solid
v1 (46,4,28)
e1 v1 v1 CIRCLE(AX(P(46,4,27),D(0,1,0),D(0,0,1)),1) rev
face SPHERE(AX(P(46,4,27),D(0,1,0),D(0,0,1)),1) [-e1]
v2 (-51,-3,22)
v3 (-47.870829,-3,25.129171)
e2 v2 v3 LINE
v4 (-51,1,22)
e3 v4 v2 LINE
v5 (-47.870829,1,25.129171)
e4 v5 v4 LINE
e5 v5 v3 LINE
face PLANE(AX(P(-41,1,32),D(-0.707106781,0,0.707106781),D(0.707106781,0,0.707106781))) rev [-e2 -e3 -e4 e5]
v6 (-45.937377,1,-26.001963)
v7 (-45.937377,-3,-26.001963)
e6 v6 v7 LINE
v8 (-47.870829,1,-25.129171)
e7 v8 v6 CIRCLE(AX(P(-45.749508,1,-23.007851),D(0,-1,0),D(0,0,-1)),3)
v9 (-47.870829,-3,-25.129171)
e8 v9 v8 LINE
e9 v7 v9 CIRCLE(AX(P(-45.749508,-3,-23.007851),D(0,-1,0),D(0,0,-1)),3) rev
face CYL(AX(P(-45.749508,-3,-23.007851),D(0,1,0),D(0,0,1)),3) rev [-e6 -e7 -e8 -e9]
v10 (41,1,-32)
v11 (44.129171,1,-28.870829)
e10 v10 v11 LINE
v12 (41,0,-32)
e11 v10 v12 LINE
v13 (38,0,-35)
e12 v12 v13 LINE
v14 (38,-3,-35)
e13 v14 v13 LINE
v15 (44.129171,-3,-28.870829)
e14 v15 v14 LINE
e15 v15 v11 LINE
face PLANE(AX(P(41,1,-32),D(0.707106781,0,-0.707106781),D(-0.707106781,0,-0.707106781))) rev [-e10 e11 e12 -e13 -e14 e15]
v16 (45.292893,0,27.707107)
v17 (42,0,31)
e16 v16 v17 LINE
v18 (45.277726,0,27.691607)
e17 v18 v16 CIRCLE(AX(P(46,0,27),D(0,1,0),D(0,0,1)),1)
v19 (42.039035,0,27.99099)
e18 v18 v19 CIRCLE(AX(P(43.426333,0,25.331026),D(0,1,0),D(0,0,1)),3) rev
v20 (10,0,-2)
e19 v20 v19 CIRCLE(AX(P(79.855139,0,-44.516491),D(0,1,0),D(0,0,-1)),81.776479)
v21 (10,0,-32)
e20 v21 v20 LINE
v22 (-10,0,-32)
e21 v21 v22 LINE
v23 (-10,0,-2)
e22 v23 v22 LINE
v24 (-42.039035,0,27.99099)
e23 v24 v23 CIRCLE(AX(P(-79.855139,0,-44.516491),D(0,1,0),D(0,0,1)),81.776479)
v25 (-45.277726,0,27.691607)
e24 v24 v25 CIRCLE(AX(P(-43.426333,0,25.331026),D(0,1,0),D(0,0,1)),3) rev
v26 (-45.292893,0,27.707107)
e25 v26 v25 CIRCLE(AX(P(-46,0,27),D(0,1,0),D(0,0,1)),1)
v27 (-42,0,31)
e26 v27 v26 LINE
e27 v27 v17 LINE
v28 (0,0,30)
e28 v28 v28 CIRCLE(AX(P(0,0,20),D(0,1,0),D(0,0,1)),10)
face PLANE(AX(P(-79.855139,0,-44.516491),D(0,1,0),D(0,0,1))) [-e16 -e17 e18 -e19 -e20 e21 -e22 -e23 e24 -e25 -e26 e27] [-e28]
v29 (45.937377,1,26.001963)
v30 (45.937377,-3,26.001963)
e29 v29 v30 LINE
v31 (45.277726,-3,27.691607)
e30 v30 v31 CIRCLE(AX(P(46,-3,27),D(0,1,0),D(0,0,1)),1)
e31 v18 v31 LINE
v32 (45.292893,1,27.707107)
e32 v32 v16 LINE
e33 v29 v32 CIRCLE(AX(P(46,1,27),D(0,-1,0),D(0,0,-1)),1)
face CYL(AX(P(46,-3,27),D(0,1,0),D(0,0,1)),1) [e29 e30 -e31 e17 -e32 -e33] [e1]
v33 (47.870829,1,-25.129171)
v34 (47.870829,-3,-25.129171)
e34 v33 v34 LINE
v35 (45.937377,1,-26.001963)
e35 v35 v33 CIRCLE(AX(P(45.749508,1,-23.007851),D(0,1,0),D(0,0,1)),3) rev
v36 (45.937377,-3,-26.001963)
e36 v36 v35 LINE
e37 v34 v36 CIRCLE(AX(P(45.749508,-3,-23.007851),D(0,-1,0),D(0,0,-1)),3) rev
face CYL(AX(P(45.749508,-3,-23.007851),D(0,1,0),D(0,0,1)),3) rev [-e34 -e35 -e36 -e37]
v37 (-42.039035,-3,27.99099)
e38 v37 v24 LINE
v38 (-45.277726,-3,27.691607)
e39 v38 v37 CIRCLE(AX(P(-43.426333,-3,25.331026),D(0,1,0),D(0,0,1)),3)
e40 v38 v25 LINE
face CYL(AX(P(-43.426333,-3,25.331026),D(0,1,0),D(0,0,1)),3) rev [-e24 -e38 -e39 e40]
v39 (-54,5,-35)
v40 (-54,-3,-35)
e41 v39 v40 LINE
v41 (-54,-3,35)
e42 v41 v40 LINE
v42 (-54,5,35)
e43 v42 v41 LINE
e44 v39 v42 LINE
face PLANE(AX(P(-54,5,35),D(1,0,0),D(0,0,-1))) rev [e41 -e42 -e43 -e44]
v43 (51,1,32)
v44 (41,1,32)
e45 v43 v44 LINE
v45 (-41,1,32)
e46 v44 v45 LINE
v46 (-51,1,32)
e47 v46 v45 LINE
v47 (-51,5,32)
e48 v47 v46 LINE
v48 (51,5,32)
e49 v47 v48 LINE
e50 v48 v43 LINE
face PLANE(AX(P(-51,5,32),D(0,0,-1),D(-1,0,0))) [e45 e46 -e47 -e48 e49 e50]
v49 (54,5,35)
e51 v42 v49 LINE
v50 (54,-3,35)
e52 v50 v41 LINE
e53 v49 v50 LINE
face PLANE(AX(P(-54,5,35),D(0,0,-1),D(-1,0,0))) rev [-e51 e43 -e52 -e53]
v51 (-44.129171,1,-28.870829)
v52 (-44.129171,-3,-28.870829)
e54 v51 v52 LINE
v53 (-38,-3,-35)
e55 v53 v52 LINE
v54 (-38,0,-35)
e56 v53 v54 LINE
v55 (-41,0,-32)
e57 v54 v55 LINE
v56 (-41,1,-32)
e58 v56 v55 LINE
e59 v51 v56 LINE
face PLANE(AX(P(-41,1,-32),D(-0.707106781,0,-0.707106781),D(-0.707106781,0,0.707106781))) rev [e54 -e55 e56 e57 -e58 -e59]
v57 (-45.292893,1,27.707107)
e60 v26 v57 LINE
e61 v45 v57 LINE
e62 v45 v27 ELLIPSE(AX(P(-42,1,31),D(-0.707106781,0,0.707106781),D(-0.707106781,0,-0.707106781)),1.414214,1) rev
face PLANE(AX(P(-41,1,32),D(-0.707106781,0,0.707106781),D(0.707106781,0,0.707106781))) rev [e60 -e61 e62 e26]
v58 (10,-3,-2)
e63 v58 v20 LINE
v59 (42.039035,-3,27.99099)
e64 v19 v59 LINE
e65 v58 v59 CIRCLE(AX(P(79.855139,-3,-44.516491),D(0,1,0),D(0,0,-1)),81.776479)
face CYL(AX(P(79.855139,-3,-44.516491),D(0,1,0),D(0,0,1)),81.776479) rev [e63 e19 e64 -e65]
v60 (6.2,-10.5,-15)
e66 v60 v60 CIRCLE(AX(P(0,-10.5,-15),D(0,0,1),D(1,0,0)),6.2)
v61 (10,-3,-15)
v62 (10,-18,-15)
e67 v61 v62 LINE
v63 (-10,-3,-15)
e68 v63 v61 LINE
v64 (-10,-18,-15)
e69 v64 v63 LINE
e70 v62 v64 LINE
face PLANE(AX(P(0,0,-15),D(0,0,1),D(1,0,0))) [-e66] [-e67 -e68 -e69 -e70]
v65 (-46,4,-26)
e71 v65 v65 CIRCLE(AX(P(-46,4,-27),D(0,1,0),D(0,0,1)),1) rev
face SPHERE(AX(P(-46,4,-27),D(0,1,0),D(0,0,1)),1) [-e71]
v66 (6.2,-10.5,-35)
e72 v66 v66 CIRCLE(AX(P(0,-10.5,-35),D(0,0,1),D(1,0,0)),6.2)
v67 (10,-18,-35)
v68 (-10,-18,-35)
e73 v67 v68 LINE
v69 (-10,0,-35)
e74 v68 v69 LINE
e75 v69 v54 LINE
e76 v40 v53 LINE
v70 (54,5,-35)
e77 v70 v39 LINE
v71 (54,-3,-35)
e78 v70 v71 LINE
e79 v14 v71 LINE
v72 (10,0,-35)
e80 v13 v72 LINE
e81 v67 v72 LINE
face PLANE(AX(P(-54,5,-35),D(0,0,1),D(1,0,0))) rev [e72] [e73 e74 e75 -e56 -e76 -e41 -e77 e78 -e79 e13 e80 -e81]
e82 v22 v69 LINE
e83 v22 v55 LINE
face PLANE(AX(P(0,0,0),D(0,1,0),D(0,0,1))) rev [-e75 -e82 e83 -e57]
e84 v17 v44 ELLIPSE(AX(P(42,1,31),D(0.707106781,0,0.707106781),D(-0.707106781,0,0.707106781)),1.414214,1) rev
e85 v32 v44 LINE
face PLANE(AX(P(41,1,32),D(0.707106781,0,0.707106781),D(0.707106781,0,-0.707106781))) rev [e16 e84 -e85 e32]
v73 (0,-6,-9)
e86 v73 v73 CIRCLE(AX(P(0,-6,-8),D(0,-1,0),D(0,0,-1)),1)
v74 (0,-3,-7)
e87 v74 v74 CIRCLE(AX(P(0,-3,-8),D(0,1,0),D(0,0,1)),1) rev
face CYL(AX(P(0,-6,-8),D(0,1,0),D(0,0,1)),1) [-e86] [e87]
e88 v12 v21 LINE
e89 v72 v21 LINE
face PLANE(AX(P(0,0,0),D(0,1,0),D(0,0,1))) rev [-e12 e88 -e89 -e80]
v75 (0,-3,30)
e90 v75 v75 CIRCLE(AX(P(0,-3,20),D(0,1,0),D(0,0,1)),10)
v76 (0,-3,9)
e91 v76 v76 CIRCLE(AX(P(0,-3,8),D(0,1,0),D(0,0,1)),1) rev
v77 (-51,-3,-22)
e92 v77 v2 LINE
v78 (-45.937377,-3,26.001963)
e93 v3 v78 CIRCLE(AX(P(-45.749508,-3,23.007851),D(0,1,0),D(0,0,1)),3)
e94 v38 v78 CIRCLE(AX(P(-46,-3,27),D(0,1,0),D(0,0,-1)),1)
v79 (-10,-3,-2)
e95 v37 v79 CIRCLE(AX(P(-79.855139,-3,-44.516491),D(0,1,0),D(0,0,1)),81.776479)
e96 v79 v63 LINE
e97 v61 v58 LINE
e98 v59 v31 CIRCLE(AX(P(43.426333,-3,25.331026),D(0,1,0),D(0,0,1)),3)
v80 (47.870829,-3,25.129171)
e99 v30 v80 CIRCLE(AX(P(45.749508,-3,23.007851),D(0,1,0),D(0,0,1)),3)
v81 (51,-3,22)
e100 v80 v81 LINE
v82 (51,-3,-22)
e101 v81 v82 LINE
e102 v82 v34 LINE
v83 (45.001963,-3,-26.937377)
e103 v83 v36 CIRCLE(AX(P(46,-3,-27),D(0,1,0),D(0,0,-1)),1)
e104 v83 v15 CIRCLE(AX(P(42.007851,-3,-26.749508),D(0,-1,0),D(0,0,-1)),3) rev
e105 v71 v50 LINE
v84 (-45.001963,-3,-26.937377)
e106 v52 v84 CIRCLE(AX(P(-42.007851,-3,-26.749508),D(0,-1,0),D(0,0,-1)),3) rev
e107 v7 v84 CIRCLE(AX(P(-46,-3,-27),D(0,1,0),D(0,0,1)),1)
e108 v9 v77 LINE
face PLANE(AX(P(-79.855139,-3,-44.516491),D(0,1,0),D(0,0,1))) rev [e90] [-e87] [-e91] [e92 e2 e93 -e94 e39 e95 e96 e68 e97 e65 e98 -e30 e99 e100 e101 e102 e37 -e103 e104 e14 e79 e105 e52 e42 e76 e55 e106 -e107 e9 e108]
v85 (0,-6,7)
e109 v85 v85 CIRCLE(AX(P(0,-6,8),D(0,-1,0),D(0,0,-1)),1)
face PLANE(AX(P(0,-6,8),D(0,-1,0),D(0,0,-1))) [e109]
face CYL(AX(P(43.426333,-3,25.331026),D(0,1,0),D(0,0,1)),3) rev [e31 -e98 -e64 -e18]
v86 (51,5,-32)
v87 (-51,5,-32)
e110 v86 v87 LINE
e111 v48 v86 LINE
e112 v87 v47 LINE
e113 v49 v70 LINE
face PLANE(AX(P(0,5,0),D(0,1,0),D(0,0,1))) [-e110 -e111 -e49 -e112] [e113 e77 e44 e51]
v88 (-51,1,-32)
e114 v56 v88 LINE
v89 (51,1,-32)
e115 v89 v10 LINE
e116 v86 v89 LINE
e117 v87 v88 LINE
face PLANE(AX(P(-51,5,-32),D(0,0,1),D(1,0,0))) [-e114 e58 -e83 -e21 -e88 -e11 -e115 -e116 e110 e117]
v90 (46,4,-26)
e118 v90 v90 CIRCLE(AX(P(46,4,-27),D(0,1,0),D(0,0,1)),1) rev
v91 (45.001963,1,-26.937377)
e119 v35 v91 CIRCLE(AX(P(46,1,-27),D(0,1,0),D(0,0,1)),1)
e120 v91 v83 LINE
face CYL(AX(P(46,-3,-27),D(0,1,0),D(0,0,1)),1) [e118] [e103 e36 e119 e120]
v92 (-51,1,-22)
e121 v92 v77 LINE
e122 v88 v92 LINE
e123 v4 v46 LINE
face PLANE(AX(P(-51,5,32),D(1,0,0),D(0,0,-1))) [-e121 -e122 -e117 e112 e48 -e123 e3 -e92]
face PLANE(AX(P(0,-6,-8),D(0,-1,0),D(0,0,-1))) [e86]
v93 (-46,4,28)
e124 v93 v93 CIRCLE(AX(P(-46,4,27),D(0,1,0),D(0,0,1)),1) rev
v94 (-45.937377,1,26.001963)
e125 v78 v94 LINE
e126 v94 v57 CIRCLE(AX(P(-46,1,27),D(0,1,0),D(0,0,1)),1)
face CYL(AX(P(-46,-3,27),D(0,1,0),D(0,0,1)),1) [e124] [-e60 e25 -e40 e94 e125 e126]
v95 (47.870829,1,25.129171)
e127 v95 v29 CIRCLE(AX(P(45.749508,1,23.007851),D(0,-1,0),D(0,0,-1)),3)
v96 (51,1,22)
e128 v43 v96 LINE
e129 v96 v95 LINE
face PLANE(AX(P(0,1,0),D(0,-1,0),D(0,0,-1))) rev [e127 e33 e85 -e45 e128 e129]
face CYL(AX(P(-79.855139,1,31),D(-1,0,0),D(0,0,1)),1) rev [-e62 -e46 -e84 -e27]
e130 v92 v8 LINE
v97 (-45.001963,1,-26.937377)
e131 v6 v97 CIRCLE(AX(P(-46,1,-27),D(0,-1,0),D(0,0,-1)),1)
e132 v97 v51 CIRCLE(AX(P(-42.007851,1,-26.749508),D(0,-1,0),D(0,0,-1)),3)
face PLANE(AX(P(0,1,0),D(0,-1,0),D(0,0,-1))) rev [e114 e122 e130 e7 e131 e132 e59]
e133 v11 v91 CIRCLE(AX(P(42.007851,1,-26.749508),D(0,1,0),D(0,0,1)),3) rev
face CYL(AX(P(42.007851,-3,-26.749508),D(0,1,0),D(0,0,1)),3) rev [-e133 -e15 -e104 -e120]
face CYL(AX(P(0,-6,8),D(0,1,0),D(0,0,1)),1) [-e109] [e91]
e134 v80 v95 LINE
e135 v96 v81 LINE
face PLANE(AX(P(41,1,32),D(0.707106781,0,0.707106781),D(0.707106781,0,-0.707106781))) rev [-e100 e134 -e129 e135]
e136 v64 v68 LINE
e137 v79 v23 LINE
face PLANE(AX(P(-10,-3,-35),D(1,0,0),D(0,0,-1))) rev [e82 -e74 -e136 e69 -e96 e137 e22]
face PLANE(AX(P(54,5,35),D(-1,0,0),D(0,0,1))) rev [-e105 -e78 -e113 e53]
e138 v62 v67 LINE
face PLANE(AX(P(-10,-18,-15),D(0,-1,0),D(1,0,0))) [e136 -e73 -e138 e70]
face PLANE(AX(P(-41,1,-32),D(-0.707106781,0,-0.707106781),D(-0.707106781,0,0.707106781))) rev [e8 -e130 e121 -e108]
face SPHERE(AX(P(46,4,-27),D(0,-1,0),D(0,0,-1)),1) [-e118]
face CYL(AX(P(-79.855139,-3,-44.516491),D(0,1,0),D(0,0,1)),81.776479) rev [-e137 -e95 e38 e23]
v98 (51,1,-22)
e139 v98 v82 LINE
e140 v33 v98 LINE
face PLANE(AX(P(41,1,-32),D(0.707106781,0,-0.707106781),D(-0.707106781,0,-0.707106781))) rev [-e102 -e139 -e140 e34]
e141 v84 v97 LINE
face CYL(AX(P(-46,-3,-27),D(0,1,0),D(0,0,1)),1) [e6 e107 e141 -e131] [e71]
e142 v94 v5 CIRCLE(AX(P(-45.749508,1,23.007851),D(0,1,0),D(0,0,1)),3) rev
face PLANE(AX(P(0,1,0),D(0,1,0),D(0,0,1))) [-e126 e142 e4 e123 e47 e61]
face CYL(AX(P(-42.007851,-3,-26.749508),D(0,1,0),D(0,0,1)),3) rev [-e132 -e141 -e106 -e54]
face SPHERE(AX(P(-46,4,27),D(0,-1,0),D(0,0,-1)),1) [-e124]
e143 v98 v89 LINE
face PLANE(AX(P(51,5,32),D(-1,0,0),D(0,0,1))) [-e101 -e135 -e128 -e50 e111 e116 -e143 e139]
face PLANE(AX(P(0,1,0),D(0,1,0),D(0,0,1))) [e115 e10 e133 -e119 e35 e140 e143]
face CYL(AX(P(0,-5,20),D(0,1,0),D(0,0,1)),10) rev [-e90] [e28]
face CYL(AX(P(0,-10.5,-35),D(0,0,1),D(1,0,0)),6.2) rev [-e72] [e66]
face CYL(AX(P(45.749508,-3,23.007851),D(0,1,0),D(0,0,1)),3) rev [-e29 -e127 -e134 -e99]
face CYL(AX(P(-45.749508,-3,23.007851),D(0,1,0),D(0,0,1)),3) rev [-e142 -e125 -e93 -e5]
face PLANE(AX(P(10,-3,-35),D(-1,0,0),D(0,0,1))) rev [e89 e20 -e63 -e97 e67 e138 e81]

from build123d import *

# Parameters (mm, degrees)
SKETCH_1_W          = 108
SKETCH_1_H          = 70
SKETCH_1_W_2        = 102
SKETCH_1_H_2        = 64
EXTRUDE_1_DEPTH     = 5
EXTRUDE_8_DEPTH     = 3
SKETCH_4_W          = 20
SKETCH_4_H          = 18
EXTRUDE_9_DEPTH     = 20
SKETCH_5_R          = 6.2
CUT_EXTRUDE_1_DEPTH = 76.7627877
FILLET_2_R          = 1
EXTRUDE_10_DEPTH    = 1
EXTRUDE_11_DEPTH    = 3
FILLET_3_R          = 3
SKETCH_8_R          = 10
CUT_EXTRUDE_2_DEPTH = 5
SKETCH_9_R          = 1
EXTRUDE_12_DEPTH    = 4
FILLET_4_R          = 3
FILLET_5_R          = 1
EXTRUDE_13_DEPTH    = 3
SKETCH_12_R         = 1
EXTRUDE_15_DEPTH    = 3


with BuildPart() as part:
    # 草图1 → 凸台-拉伸1 (new body)
    with BuildSketch(Plane(origin=(0, 0, 0), x_dir=(1, 0, 0), z_dir=(0, 1, 0))):
        Rectangle(SKETCH_1_W, SKETCH_1_H)
        Rectangle(SKETCH_1_W_2, SKETCH_1_H_2, mode=Mode.SUBTRACT)
    extrude(amount=EXTRUDE_1_DEPTH)

    # 草图3 → 凸台-拉伸8 (add)
    with BuildSketch(Plane.XZ):
        with BuildLine():
            Line((10, -35), (-10, -35))
            Line((-10, -35), (-10, -2))
            ThreePointArc((-10, -2), (-28.889417714, 19.435738798), (-54, 33.065106234))
            Line((-54, 33.065106234), (-54, 35))
            Line((-54, 35), (54, 35))
            Line((54, 35), (54, 33.065106234))
            ThreePointArc((54, 33.065106234), (28.889417714, 19.435738798), (10, -2))
            Line((10, -2), (10, -35))
        make_face()
    extrude(amount=EXTRUDE_8_DEPTH)

    # 草图4 → 凸台-拉伸9 (add)
    with BuildSketch(Plane(origin=(0, 0, -35), x_dir=(-1, 0, 0), z_dir=(0, 0, -1))):
        with Locations((0, -9)):
            Rectangle(SKETCH_4_W, SKETCH_4_H)
    extrude(amount=-EXTRUDE_9_DEPTH)

    # 草图5 → 切除-拉伸1 (cut, through all)
    with BuildSketch(Plane.XY.offset(-15)):
        with Locations((0, -10.5)):
            Circle(SKETCH_5_R)
    extrude(amount=-CUT_EXTRUDE_1_DEPTH, mode=Mode.SUBTRACT)

    # 圆角2
    # the kernel refuses this fillet: 1 mm, written as the material it adds along each edge
    with BuildSketch(Plane(origin=(-53.5, 0, 32), x_dir=(0, 1, 0), z_dir=(1, 0, 0))) as fillet_2_piece_1:
        with BuildLine():
            CenterArc((FILLET_2_R, -FILLET_2_R), FILLET_2_R, 90, 90)
            Line((0, -FILLET_2_R), (0, 0))
            Line((0, 0), (FILLET_2_R, 0))
        make_face()
    extrude(amount=107)

    # 草图6 → 凸台-拉伸10 (add)
    with BuildSketch(Plane(origin=(0, 0, 0), x_dir=(1, 0, 0), z_dir=(0, 1, 0))):
        Polygon((51, 32), (41, 32), (51, 22), align=None)
        Polygon((-51, 32), (-41, 32), (-51, 22), align=None)
        Polygon((-51, -22), (-51, -32), (-41, -32), align=None)
        Polygon((51, -32), (41, -32), (51, -22), align=None)
    extrude(amount=EXTRUDE_10_DEPTH)

    # 草图7 → 凸台-拉伸11 (add)
    with BuildSketch(Plane.XZ):
        Polygon((38, -35), (54, -19), (54, -35), align=None)
        Polygon((-54, -35), (-38, -35), (-54, -19), align=None)
        Polygon((54, 35), (38, 35), (54, 19), align=None)
        Polygon((-54, 35), (-38, 35), (-54, 19), align=None)
    extrude(amount=EXTRUDE_11_DEPTH)

    # 圆角3
    fillet_3_edges = [part.edges().sort_by_distance(p)[0] for p in [
        (44.013135699, -1.5, 28.986864301),
        (-44.013135699, -1.5, 28.986864301),
    ]]
    fillet(fillet_3_edges, radius=FILLET_3_R)

    # 草图8 → 切除-拉伸2 (cut, symmetric)
    with BuildSketch(Plane(origin=(0, 0, 0), x_dir=(1, 0, 0), z_dir=(0, 1, 0))):
        with Locations(Location((0, -20, 0), (0, 0, 270))):
            Circle(SKETCH_8_R)
    extrude(amount=CUT_EXTRUDE_2_DEPTH, both=True, mode=Mode.SUBTRACT)

    # 草图9 → 凸台-拉伸12 (add, symmetric)
    with BuildSketch(Plane(origin=(0, 1, 0), x_dir=(1, 0, 0), z_dir=(0, 1, 0))):
        with Locations(Location((46, -27, 0), (0, 0, 270))):
            Circle(SKETCH_9_R)
        with Locations(Location((-46, -27, 0), (0, 0, 315))):
            Circle(SKETCH_9_R)
        with Locations(Location((-46, 27, 0), (0, 0, 270))):
            Circle(SKETCH_9_R)
        with Locations(Location((46, 27, 0), (0, 0, 315))):
            Circle(SKETCH_9_R)
    extrude(amount=EXTRUDE_12_DEPTH, both=True)

    # 圆角4
    # the kernel refuses this fillet: 3 mm, written as the material it adds along each edge
    with BuildSketch(Plane(origin=(46.707106781, -3, 26.292893219), x_dir=(0.7071067811865442, 0, -0.7071067811865508), z_dir=(0, 1, 0)), Plane(origin=(-46.707106781, -3, -26.292893219), x_dir=(-0.7071067811865422, 0, 0.707106781186553), z_dir=(0, 1, 0))) as fillet_4_piece_1:
        with BuildLine():
            CenterArc((1.645751311, 3), FILLET_4_R, 228.590377891, 41.409622109)
            ThreePointArc((-0.338562172, 0.75), (-0.088562172, 0.411437828), (0, 0))
            Line((0, 0), (1.645751311, 0))
        make_face()
    extrude(amount=4)
    with BuildSketch(Plane(origin=(-46.707106781, -3, 26.292893219), x_dir=(0.9354143466934858, 0, -0.3535533905932727), z_dir=(0, 1, 0))) as fillet_4_piece_2:
        with BuildLine():
            CenterArc((2.057189139, 2.734313483), FILLET_4_R, 204.295188945, 41.409622109)
            Line((-0.677124344, 1.5), (0, 0))
            ThreePointArc((0, 0), (0.411437828, 0.088562172), (0.822875656, 0))
        make_face()
    extrude(amount=4)
    with BuildSketch(Plane(origin=(-45.292893219, -3, -27.707106781), x_dir=(0.7071067811865529, 0, -0.7071067811865421), z_dir=(0, 1, 0)), Plane(origin=(46.707106781, -3, -26.292893219), x_dir=(0.7071067811865476, 0, 0.7071067811865476), z_dir=(0, 1, 0))) as fillet_4_piece_3:
        with BuildLine():
            CenterArc((1.645751311, -3), FILLET_4_R, 90, 41.409622109)
            ThreePointArc((-0.338562172, -0.75), (-0.088562172, -0.411437828), (0, 0))
            Line((0, 0), (1.645751311, 0))
        make_face()
    extrude(amount=4)
    with BuildSketch(Plane(origin=(45.292893219, -3, -27.707106781), x_dir=(-0.35355339059328167, 0, 0.9354143466934823), z_dir=(0, 1, 0))) as fillet_4_piece_4:
        with BuildLine():
            CenterArc((2.057189139, -2.734313483), FILLET_4_R, 114.295188945, 41.409622109)
            Line((-0.677124344, -1.5), (0, 0))
            ThreePointArc((0, 0), (0.411437828, -0.088562172), (0.822875656, 0))
        make_face()
    extrude(amount=4)

    # 圆角5
    fillet_5_edges = [part.edges().sort_by_distance(p)[0] for p in [
        (46, 5, 26),
        (-46.707106781, 5, 26.292893219),
        (-46, 5, -28),
        (45.292893219, 5, -27.707106781),
    ]]
    fillet(fillet_5_edges, radius=FILLET_5_R)

    # 草图10 → 凸台-拉伸13 (add)
    with BuildSketch(Plane.XZ):
        Polygon((-51, 22), (-54, 19), (-54, -19), (-51, -22), align=None)
        Polygon((54, -19), (51, -22), (51, 22), (54, 19), align=None)
    extrude(amount=EXTRUDE_13_DEPTH)

    # 草图12 → 凸台-拉伸15 (add)
    with BuildSketch(Plane.XZ.offset(3)):
        with Locations(Location((0, -8, 0), (0, 0, 90))):
            Circle(SKETCH_12_R)
        with Locations(Location((0, 8, 0), (0, 0, 90))):
            Circle(SKETCH_12_R)
    extrude(amount=EXTRUDE_15_DEPTH)


solid = part.part
